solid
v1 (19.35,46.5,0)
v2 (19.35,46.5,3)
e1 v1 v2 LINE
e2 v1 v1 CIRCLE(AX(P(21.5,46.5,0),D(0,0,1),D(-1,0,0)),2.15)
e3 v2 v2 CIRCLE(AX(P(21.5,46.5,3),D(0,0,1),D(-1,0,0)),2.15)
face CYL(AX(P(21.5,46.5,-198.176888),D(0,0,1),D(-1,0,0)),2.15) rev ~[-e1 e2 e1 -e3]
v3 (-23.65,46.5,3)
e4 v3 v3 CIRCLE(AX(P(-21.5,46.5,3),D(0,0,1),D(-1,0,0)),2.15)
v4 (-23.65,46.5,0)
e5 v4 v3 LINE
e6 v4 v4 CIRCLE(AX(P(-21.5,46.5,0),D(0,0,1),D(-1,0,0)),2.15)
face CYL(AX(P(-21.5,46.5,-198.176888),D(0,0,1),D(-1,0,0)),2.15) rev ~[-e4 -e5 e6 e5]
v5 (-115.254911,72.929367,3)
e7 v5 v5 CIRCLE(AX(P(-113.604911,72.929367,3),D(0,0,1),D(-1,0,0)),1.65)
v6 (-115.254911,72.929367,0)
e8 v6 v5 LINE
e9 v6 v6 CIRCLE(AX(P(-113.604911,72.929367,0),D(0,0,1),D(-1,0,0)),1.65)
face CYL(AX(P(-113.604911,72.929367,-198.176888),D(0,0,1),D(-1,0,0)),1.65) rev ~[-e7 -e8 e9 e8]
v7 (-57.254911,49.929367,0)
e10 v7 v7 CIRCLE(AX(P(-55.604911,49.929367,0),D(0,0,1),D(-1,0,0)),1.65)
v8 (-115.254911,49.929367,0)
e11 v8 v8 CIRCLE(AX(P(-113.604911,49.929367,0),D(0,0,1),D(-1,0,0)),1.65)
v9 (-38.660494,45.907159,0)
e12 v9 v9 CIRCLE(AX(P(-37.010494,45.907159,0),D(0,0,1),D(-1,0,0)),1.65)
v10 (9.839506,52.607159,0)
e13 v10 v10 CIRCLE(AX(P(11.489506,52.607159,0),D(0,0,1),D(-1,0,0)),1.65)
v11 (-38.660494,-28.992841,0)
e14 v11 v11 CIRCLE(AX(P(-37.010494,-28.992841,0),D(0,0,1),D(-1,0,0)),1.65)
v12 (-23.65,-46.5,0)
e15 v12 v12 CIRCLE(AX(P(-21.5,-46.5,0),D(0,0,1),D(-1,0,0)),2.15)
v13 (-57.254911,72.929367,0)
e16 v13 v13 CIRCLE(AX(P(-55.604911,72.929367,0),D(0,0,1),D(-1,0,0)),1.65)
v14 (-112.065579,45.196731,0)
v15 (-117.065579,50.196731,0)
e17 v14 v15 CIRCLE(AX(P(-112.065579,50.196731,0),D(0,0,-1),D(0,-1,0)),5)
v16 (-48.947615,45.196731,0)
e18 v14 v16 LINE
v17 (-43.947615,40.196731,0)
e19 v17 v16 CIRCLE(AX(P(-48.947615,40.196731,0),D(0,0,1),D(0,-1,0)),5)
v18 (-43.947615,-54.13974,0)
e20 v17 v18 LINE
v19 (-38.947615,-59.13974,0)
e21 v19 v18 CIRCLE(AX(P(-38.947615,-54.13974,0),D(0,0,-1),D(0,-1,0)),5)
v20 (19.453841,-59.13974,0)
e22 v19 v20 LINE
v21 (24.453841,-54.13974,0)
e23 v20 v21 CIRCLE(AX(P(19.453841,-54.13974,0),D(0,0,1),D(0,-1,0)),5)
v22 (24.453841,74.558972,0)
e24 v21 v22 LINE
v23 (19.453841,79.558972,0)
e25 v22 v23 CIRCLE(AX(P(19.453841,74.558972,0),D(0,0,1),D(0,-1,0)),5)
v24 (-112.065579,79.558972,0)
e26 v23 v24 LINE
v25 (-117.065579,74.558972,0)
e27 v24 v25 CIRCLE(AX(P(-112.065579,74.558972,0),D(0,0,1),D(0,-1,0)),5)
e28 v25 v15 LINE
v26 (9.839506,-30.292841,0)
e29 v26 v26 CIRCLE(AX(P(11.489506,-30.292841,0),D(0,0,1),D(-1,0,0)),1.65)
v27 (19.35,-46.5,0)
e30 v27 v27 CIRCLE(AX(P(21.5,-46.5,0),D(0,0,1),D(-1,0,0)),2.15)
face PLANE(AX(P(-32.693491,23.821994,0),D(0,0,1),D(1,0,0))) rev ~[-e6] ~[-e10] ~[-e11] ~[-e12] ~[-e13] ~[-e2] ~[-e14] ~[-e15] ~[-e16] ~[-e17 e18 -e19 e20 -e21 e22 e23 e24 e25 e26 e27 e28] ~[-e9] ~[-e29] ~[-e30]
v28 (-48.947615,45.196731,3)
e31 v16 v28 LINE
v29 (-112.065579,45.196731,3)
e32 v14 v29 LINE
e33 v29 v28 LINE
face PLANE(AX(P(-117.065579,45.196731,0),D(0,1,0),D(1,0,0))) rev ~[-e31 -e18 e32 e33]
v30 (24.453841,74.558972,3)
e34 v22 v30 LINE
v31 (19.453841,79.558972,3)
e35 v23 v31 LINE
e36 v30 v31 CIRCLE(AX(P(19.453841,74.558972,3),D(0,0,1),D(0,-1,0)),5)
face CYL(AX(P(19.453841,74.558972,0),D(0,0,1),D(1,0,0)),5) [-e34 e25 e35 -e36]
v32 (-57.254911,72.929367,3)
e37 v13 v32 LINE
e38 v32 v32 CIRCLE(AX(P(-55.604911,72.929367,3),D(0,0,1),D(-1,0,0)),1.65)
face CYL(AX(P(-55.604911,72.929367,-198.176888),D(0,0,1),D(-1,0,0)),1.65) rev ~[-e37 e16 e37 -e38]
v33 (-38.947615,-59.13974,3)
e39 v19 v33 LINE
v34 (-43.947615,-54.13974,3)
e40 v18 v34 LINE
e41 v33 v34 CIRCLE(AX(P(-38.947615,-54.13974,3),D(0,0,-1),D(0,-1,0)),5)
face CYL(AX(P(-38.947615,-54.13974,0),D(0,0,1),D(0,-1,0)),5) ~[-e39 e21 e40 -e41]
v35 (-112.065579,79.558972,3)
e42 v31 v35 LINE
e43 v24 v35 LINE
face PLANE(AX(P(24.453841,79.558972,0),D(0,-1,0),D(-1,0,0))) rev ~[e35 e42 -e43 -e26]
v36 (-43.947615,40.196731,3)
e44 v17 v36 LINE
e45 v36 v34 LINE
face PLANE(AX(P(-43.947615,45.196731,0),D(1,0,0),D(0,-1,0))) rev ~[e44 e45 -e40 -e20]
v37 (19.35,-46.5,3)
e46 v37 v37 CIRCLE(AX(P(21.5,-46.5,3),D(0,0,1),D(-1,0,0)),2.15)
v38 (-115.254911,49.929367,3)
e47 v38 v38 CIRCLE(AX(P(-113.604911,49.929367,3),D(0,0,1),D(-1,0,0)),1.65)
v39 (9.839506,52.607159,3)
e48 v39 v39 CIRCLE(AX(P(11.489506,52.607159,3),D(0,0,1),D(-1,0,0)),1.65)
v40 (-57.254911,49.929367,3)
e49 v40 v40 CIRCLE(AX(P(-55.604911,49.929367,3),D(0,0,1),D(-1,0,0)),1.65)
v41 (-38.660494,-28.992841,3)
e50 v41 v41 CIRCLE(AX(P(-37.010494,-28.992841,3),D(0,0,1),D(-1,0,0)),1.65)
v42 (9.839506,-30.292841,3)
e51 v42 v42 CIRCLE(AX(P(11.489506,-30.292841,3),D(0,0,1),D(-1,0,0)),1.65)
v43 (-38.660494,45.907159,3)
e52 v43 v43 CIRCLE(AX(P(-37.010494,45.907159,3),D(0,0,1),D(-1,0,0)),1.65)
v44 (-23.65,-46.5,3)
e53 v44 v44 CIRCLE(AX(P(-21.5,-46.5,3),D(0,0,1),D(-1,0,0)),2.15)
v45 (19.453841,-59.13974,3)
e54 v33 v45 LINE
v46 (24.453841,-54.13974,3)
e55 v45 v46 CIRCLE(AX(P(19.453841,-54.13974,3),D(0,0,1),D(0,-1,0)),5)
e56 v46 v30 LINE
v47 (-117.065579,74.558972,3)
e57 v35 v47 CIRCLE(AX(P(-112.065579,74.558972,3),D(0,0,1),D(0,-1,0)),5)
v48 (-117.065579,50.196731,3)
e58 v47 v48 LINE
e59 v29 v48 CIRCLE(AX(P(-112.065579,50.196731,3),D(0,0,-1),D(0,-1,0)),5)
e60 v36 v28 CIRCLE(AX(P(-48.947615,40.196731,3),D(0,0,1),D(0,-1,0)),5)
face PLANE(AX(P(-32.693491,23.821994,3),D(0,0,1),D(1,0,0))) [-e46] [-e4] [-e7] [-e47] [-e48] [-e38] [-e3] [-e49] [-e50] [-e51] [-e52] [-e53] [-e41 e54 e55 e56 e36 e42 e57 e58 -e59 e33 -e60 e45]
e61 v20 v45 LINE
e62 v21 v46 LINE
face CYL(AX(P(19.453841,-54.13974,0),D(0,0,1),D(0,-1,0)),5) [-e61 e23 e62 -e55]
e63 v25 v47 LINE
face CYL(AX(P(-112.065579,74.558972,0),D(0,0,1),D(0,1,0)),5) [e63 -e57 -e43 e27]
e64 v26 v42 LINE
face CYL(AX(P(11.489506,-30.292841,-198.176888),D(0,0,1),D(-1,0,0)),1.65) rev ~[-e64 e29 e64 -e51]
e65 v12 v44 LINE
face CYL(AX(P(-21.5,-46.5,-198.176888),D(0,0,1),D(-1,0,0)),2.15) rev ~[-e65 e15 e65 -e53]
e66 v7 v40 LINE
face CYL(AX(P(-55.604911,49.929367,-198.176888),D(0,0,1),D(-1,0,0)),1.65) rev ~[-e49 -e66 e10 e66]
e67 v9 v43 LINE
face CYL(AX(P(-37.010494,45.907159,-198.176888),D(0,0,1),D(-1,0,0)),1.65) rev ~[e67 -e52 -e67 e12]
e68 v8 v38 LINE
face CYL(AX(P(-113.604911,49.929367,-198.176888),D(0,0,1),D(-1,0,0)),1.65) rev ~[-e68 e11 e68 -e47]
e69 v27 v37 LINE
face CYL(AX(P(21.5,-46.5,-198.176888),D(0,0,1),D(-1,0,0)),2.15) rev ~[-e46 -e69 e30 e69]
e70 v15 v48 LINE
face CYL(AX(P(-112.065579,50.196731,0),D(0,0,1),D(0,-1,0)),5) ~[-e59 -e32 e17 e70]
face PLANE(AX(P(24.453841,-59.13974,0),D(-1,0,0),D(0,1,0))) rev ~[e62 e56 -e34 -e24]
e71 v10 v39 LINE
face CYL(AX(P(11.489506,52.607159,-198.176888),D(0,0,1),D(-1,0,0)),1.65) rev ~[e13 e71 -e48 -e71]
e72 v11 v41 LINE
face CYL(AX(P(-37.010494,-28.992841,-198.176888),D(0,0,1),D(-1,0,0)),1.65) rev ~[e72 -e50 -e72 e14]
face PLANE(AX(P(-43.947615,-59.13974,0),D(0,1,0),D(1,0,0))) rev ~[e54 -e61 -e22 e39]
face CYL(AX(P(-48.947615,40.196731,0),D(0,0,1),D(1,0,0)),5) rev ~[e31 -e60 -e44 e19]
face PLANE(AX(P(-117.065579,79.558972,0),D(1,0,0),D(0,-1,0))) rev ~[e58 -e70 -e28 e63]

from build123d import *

# Parameters (mm, degrees)
F1_DEPTH = 3
F2_D     = 3.3
F3_D     = 4.3
F4_R     = 5


# Not quite as in the source:
# - a feature names something its author has since deleted; it is built from what else it names


with BuildPart() as f1:
    # F0 (on Top) → F1 (new body)
    with BuildSketch(Plane.XY):
        Polygon((-43.9476147294, -59.139739722), (24.4538411498, -59.139739722), (24.4538411498, 79.5589722693), (-117.0655786991, 79.5589722693), (-117.0655786991, 45.1967306435), (-43.9476147294, 45.1967306435), align=None)
    extrude(amount=F1_DEPTH)

    # F2 (through all)
    with Locations(Plane(origin=(0, 0, 0), x_dir=(1, 0, 0), z_dir=(0, 0, -1))):
        with Locations((-113.6049106717, -72.9293674231), (-113.6049106717, -49.9293674231), (-55.6049106717, -49.9293674231), (-55.6049106717, -72.9293674231), (-37.0104938323, -45.9071589798), (11.4895061677, -52.6071589798), (11.4895061677, 30.2928410202), (-37.0104938323, 28.9928410202)):
            Hole(F2_D / 2)

    # F3 (through all)
    with Locations(Plane(origin=(0, 0, 0), x_dir=(1, 0, 0), z_dir=(0, 0, -1))):
        with Locations((-21.5, -46.5), (21.5, -46.5), (21.5, 46.5), (-21.5, 46.5)):
            Hole(F3_D / 2)

    # F4
    f4_edges = [f1.edges().sort_by_distance(p)[0] for p in [
        (-117.065579, 79.558972, 1.5),
        (-43.947615, 45.196731, 1.5),
        (-117.065579, 45.196731, 1.5),
        (24.453841, 79.558972, 1.5),
        (24.453841, -59.13974, 1.5),
        (-43.947615, -59.13974, 1.5),
    ]]
    fillet(f4_edges, radius=F4_R)


solid = f1.part
